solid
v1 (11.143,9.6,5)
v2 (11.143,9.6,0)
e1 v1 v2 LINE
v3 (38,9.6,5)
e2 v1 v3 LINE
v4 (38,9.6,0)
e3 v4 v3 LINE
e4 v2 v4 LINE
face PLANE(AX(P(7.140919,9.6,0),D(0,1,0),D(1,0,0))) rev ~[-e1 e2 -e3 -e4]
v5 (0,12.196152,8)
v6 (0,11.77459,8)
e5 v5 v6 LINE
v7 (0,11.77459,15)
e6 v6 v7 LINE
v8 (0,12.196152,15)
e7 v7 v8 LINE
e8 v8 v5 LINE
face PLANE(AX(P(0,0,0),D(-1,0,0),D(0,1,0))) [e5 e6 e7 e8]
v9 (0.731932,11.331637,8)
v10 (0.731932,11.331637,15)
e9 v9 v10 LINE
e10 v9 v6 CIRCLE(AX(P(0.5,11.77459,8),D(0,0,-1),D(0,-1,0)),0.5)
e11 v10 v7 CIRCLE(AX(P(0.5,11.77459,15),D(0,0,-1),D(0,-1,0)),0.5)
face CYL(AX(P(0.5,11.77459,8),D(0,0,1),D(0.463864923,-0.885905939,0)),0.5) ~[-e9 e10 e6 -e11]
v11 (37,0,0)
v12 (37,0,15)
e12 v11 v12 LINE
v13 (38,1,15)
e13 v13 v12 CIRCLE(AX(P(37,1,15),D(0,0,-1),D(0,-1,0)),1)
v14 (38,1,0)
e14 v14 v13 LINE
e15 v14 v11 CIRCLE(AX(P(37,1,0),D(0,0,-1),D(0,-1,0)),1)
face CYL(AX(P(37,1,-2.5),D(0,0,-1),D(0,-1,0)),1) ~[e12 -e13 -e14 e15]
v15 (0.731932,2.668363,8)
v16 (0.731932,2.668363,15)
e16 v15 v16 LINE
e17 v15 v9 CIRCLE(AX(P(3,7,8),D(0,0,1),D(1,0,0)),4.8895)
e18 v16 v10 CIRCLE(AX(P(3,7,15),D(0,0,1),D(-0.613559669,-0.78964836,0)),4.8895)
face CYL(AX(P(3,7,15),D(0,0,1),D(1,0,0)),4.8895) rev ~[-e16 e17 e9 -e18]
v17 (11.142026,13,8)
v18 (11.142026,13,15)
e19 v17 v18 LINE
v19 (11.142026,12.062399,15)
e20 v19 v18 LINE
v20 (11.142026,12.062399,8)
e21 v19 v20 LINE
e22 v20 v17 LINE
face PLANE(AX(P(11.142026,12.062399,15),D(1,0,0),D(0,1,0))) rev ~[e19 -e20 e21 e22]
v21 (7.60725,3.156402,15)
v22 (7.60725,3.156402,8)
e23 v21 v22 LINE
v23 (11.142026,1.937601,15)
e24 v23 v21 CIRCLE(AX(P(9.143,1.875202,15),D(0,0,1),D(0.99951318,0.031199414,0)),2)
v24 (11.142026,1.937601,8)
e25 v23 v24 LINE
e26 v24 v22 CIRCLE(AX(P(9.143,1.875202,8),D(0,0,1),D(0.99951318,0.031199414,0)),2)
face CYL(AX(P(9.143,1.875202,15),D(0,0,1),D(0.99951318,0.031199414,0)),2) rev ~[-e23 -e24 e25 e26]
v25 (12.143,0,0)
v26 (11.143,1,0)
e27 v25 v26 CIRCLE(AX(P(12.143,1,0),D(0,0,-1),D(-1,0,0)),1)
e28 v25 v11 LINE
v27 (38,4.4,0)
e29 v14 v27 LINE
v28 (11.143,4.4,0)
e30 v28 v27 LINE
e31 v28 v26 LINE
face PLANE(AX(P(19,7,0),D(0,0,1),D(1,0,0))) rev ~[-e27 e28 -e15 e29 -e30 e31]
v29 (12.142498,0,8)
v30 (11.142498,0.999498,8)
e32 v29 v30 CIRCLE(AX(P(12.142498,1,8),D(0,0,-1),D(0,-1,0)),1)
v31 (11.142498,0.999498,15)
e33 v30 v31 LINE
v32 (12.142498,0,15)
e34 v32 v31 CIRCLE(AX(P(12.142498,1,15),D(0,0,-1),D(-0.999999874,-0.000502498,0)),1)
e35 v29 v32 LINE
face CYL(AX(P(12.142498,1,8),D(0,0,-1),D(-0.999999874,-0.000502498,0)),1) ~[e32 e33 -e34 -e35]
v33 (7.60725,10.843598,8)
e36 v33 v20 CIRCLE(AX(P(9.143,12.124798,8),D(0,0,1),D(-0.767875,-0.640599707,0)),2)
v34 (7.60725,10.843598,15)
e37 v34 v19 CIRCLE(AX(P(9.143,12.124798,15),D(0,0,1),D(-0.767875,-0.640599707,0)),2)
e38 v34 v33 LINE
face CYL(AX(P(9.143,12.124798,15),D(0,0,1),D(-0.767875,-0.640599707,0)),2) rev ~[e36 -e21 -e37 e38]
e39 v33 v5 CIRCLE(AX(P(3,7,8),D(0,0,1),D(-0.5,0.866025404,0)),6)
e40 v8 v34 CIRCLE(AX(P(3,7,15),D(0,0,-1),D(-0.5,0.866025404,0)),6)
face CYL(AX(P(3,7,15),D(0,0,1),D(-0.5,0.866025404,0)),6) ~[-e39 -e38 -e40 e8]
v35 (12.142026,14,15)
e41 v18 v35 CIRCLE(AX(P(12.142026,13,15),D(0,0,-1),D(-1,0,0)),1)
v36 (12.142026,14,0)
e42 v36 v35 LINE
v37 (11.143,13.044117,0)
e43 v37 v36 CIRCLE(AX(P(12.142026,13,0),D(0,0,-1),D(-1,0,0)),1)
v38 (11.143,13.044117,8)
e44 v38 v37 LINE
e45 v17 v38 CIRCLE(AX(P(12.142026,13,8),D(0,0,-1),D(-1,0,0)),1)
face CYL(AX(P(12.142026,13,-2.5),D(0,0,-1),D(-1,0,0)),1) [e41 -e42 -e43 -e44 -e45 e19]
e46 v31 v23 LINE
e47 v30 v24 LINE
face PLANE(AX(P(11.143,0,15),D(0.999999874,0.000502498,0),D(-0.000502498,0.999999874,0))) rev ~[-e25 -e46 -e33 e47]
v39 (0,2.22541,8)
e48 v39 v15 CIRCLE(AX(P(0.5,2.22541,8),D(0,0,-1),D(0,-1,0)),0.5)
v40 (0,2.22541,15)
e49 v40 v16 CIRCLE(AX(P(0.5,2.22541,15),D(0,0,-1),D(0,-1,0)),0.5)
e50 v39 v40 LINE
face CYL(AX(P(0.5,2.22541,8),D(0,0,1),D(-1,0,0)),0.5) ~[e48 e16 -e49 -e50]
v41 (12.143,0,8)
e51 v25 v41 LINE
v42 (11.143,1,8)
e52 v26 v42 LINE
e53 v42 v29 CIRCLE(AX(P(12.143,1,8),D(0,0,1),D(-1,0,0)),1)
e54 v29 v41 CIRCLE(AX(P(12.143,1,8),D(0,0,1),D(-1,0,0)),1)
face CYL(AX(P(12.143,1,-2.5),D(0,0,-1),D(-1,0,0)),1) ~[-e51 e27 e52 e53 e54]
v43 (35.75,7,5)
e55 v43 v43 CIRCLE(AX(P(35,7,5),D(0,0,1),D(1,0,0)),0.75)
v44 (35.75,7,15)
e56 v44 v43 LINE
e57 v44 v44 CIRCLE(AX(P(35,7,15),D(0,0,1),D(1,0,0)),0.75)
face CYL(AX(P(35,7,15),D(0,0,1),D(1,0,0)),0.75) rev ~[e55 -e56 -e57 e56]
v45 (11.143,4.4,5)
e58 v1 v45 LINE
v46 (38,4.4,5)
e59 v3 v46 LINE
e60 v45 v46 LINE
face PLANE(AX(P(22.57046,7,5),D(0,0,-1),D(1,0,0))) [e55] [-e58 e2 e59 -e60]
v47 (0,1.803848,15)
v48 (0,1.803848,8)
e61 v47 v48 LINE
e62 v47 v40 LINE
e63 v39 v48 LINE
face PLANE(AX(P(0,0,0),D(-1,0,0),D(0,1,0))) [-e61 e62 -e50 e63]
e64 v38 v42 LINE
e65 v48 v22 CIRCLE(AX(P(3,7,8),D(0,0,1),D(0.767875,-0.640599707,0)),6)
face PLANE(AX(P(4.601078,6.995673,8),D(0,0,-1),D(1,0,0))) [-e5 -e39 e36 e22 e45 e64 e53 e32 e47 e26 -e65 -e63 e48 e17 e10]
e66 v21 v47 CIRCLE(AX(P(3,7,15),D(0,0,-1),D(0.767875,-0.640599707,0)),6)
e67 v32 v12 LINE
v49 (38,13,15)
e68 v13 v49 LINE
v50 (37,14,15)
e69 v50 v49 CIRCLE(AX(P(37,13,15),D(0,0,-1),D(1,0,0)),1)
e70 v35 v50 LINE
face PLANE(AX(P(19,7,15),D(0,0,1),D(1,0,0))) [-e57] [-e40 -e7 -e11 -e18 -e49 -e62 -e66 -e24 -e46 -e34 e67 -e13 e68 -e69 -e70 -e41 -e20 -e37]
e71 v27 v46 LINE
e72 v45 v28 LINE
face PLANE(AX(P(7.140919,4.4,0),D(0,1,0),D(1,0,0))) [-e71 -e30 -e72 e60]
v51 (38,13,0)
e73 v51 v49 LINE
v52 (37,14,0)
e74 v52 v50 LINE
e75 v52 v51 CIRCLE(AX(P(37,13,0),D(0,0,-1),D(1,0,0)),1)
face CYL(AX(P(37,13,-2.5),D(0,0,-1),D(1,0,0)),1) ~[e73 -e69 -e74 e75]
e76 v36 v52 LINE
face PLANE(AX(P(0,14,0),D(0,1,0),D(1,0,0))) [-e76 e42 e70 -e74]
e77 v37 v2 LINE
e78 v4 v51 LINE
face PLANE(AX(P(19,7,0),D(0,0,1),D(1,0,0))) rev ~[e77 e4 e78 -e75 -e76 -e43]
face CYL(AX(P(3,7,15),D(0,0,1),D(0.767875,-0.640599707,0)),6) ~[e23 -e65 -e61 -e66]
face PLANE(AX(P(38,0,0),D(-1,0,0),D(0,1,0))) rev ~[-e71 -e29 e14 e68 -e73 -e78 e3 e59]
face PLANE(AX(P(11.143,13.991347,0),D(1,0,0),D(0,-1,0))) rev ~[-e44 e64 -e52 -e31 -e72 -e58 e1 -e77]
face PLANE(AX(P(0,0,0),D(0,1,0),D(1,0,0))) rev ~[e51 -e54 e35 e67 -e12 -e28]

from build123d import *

# Parameters (mm, degrees)
F0_W         = 38
F0_H         = 14
F1_DEPTH     = 15
F2_R         = 4.8895
F3_DEPTH     = 15.001
F4_W         = 30.8590809897
F4_H         = 5.2
F5_DEPTH     = 5
F7_DEPTH     = 15.001
F8_W         = 13.0838444641
F8_H         = 13.9913465828
F9_DEPTH     = 8
F11_R        = 0.75
F12_DEPTH    = 15.001
F13_R        = 0.5
F14_T1_DEPTH = 9.498744071
F14_T3_DEPTH = 10.5
F14_T5_DEPTH = 20


# Not quite as in the source:
# - a fillet or chamfer that OpenCascade refuses, or shapes differently, is made with other operations: its cross-section is extruded or revolved along the edge and cut away or added


with BuildPart() as f1:
    # F0 (on Top) → F1 (new body)
    with BuildSketch(Plane.XY):
        with Locations((19, 7)):
            Rectangle(F0_W, F0_H)
    extrude(amount=F1_DEPTH)

    # F2 (on face) → F3 (cut, through all)
    with BuildSketch(Plane.XY.offset(15)):
        with Locations((3, 7)):
            Circle(F2_R)
    extrude(amount=-F3_DEPTH, mode=Mode.SUBTRACT)

    # F4 (on face) → F5 (cut)
    with BuildSketch(Plane(origin=(0, 0, 0), x_dir=(1, 0, 0), z_dir=(0, 0, -1))):
        with Locations((22.5704595052, -7)):
            Rectangle(F4_W, F4_H)
    extrude(amount=-F5_DEPTH, mode=Mode.SUBTRACT)

    # F6 (on face) → F7 (cut, through all)
    with BuildSketch(Plane.XY.offset(15)):
        with BuildLine():
            ThreePointArc((7.60725, 3.1564017591), (4.0503160688, 1.0926455874), (0, 1.8038475773))
            Line((0, 1.8038475773), (0, 0))
            Line((0, 0), (11.143, 0))
            Line((11.143, 0), (11.1420263596, 1.9376011727))
            ThreePointArc((11.1420263596, 1.9376011727), (9.7949393865, 3.7659627841), (7.60725, 3.1564017591))
        make_face()
        with BuildLine():
            ThreePointArc((0, 12.1961524227), (4.0503160688, 12.9073544126), (7.60725, 10.8435982409))
            ThreePointArc((7.60725, 10.8435982409), (9.7949393865, 10.2340372159), (11.1420263596, 12.0623988273))
            Line((11.1420263596, 12.0623988273), (11.1420263596, 14))
            Line((11.1420263596, 14), (0, 14))
            Line((0, 14), (0, 12.1961524227))
        make_face()
    extrude(amount=-F7_DEPTH, mode=Mode.SUBTRACT)

    # F8 (on face) → F9 (cut)
    with BuildSketch(Plane(origin=(0, 0, 0), x_dir=(1, 0, 0), z_dir=(0, 0, -1))):
        with Locations((4.6010777679, -6.9956732914)):
            Rectangle(F8_W, F8_H)
    extrude(amount=-F9_DEPTH, mode=Mode.SUBTRACT)

    # F11 (on face) → F12 (cut, through all)
    with BuildSketch(Plane.XY.offset(15)):
        with Locations((35, 7)):
            Circle(F11_R)
    extrude(amount=-F12_DEPTH, mode=Mode.SUBTRACT)

    # F13
    f13_edges = [f1.edges().sort_by_distance(p)[0] for p in [
        (0, 10.860986, 11.5),
        (0, 3.139014, 11.5),
    ]]
    fillet(f13_edges, radius=F13_R)

    # F14: fillet of radius 1 on 5 edges, made by hand

    # F14_s2 → F14_t1 (cut)
    with BuildSketch(Plane.XY.offset(8)):
        with BuildLine():
            ThreePointArc((11.1424977547, 0.9994975022), (11.4355685293, 0.2927155813), (12.1424976284, 0))
            Line((12.1424976284, 0), (11.143, 0))
            Line((11.143, 0), (11.1424977547, 0.9994975022))
        make_face()
    extrude(amount=F14_T1_DEPTH, mode=Mode.SUBTRACT)

    # F14_s4 → F14_t3 (cut)
    with BuildSketch(Plane.XY.offset(-2.5)):
        with BuildLine():
            ThreePointArc((11.143, 1), (11.4358932188, 0.2928932188), (12.143, 0))
            Line((12.143, 0), (11.143, 0))
            Line((11.143, 0), (11.143, 1))
        make_face()
    extrude(amount=F14_T3_DEPTH, mode=Mode.SUBTRACT)

    # F14_s6 → F14_t5 (cut)
    with BuildSketch(Plane.XY.offset(-2.5)):
        with BuildLine():
            ThreePointArc((37, 0), (37.7071067812, 0.2928932188), (38, 1))
            Line((38, 1), (38, 0))
            Line((38, 0), (37, 0))
        make_face()
        with BuildLine():
            ThreePointArc((11.1420263596, 13), (11.4349195784, 13.7071067812), (12.1420263596, 14))
            Line((12.1420263596, 14), (11.1420263596, 14))
            Line((11.1420263596, 14), (11.1420263596, 13))
        make_face()
        with BuildLine():
            ThreePointArc((38, 13), (37.7071067812, 13.7071067812), (37, 14))
            Line((37, 14), (38, 14))
            Line((38, 14), (38, 13))
        make_face()
    extrude(amount=F14_T5_DEPTH, mode=Mode.SUBTRACT)


solid = f1.part
